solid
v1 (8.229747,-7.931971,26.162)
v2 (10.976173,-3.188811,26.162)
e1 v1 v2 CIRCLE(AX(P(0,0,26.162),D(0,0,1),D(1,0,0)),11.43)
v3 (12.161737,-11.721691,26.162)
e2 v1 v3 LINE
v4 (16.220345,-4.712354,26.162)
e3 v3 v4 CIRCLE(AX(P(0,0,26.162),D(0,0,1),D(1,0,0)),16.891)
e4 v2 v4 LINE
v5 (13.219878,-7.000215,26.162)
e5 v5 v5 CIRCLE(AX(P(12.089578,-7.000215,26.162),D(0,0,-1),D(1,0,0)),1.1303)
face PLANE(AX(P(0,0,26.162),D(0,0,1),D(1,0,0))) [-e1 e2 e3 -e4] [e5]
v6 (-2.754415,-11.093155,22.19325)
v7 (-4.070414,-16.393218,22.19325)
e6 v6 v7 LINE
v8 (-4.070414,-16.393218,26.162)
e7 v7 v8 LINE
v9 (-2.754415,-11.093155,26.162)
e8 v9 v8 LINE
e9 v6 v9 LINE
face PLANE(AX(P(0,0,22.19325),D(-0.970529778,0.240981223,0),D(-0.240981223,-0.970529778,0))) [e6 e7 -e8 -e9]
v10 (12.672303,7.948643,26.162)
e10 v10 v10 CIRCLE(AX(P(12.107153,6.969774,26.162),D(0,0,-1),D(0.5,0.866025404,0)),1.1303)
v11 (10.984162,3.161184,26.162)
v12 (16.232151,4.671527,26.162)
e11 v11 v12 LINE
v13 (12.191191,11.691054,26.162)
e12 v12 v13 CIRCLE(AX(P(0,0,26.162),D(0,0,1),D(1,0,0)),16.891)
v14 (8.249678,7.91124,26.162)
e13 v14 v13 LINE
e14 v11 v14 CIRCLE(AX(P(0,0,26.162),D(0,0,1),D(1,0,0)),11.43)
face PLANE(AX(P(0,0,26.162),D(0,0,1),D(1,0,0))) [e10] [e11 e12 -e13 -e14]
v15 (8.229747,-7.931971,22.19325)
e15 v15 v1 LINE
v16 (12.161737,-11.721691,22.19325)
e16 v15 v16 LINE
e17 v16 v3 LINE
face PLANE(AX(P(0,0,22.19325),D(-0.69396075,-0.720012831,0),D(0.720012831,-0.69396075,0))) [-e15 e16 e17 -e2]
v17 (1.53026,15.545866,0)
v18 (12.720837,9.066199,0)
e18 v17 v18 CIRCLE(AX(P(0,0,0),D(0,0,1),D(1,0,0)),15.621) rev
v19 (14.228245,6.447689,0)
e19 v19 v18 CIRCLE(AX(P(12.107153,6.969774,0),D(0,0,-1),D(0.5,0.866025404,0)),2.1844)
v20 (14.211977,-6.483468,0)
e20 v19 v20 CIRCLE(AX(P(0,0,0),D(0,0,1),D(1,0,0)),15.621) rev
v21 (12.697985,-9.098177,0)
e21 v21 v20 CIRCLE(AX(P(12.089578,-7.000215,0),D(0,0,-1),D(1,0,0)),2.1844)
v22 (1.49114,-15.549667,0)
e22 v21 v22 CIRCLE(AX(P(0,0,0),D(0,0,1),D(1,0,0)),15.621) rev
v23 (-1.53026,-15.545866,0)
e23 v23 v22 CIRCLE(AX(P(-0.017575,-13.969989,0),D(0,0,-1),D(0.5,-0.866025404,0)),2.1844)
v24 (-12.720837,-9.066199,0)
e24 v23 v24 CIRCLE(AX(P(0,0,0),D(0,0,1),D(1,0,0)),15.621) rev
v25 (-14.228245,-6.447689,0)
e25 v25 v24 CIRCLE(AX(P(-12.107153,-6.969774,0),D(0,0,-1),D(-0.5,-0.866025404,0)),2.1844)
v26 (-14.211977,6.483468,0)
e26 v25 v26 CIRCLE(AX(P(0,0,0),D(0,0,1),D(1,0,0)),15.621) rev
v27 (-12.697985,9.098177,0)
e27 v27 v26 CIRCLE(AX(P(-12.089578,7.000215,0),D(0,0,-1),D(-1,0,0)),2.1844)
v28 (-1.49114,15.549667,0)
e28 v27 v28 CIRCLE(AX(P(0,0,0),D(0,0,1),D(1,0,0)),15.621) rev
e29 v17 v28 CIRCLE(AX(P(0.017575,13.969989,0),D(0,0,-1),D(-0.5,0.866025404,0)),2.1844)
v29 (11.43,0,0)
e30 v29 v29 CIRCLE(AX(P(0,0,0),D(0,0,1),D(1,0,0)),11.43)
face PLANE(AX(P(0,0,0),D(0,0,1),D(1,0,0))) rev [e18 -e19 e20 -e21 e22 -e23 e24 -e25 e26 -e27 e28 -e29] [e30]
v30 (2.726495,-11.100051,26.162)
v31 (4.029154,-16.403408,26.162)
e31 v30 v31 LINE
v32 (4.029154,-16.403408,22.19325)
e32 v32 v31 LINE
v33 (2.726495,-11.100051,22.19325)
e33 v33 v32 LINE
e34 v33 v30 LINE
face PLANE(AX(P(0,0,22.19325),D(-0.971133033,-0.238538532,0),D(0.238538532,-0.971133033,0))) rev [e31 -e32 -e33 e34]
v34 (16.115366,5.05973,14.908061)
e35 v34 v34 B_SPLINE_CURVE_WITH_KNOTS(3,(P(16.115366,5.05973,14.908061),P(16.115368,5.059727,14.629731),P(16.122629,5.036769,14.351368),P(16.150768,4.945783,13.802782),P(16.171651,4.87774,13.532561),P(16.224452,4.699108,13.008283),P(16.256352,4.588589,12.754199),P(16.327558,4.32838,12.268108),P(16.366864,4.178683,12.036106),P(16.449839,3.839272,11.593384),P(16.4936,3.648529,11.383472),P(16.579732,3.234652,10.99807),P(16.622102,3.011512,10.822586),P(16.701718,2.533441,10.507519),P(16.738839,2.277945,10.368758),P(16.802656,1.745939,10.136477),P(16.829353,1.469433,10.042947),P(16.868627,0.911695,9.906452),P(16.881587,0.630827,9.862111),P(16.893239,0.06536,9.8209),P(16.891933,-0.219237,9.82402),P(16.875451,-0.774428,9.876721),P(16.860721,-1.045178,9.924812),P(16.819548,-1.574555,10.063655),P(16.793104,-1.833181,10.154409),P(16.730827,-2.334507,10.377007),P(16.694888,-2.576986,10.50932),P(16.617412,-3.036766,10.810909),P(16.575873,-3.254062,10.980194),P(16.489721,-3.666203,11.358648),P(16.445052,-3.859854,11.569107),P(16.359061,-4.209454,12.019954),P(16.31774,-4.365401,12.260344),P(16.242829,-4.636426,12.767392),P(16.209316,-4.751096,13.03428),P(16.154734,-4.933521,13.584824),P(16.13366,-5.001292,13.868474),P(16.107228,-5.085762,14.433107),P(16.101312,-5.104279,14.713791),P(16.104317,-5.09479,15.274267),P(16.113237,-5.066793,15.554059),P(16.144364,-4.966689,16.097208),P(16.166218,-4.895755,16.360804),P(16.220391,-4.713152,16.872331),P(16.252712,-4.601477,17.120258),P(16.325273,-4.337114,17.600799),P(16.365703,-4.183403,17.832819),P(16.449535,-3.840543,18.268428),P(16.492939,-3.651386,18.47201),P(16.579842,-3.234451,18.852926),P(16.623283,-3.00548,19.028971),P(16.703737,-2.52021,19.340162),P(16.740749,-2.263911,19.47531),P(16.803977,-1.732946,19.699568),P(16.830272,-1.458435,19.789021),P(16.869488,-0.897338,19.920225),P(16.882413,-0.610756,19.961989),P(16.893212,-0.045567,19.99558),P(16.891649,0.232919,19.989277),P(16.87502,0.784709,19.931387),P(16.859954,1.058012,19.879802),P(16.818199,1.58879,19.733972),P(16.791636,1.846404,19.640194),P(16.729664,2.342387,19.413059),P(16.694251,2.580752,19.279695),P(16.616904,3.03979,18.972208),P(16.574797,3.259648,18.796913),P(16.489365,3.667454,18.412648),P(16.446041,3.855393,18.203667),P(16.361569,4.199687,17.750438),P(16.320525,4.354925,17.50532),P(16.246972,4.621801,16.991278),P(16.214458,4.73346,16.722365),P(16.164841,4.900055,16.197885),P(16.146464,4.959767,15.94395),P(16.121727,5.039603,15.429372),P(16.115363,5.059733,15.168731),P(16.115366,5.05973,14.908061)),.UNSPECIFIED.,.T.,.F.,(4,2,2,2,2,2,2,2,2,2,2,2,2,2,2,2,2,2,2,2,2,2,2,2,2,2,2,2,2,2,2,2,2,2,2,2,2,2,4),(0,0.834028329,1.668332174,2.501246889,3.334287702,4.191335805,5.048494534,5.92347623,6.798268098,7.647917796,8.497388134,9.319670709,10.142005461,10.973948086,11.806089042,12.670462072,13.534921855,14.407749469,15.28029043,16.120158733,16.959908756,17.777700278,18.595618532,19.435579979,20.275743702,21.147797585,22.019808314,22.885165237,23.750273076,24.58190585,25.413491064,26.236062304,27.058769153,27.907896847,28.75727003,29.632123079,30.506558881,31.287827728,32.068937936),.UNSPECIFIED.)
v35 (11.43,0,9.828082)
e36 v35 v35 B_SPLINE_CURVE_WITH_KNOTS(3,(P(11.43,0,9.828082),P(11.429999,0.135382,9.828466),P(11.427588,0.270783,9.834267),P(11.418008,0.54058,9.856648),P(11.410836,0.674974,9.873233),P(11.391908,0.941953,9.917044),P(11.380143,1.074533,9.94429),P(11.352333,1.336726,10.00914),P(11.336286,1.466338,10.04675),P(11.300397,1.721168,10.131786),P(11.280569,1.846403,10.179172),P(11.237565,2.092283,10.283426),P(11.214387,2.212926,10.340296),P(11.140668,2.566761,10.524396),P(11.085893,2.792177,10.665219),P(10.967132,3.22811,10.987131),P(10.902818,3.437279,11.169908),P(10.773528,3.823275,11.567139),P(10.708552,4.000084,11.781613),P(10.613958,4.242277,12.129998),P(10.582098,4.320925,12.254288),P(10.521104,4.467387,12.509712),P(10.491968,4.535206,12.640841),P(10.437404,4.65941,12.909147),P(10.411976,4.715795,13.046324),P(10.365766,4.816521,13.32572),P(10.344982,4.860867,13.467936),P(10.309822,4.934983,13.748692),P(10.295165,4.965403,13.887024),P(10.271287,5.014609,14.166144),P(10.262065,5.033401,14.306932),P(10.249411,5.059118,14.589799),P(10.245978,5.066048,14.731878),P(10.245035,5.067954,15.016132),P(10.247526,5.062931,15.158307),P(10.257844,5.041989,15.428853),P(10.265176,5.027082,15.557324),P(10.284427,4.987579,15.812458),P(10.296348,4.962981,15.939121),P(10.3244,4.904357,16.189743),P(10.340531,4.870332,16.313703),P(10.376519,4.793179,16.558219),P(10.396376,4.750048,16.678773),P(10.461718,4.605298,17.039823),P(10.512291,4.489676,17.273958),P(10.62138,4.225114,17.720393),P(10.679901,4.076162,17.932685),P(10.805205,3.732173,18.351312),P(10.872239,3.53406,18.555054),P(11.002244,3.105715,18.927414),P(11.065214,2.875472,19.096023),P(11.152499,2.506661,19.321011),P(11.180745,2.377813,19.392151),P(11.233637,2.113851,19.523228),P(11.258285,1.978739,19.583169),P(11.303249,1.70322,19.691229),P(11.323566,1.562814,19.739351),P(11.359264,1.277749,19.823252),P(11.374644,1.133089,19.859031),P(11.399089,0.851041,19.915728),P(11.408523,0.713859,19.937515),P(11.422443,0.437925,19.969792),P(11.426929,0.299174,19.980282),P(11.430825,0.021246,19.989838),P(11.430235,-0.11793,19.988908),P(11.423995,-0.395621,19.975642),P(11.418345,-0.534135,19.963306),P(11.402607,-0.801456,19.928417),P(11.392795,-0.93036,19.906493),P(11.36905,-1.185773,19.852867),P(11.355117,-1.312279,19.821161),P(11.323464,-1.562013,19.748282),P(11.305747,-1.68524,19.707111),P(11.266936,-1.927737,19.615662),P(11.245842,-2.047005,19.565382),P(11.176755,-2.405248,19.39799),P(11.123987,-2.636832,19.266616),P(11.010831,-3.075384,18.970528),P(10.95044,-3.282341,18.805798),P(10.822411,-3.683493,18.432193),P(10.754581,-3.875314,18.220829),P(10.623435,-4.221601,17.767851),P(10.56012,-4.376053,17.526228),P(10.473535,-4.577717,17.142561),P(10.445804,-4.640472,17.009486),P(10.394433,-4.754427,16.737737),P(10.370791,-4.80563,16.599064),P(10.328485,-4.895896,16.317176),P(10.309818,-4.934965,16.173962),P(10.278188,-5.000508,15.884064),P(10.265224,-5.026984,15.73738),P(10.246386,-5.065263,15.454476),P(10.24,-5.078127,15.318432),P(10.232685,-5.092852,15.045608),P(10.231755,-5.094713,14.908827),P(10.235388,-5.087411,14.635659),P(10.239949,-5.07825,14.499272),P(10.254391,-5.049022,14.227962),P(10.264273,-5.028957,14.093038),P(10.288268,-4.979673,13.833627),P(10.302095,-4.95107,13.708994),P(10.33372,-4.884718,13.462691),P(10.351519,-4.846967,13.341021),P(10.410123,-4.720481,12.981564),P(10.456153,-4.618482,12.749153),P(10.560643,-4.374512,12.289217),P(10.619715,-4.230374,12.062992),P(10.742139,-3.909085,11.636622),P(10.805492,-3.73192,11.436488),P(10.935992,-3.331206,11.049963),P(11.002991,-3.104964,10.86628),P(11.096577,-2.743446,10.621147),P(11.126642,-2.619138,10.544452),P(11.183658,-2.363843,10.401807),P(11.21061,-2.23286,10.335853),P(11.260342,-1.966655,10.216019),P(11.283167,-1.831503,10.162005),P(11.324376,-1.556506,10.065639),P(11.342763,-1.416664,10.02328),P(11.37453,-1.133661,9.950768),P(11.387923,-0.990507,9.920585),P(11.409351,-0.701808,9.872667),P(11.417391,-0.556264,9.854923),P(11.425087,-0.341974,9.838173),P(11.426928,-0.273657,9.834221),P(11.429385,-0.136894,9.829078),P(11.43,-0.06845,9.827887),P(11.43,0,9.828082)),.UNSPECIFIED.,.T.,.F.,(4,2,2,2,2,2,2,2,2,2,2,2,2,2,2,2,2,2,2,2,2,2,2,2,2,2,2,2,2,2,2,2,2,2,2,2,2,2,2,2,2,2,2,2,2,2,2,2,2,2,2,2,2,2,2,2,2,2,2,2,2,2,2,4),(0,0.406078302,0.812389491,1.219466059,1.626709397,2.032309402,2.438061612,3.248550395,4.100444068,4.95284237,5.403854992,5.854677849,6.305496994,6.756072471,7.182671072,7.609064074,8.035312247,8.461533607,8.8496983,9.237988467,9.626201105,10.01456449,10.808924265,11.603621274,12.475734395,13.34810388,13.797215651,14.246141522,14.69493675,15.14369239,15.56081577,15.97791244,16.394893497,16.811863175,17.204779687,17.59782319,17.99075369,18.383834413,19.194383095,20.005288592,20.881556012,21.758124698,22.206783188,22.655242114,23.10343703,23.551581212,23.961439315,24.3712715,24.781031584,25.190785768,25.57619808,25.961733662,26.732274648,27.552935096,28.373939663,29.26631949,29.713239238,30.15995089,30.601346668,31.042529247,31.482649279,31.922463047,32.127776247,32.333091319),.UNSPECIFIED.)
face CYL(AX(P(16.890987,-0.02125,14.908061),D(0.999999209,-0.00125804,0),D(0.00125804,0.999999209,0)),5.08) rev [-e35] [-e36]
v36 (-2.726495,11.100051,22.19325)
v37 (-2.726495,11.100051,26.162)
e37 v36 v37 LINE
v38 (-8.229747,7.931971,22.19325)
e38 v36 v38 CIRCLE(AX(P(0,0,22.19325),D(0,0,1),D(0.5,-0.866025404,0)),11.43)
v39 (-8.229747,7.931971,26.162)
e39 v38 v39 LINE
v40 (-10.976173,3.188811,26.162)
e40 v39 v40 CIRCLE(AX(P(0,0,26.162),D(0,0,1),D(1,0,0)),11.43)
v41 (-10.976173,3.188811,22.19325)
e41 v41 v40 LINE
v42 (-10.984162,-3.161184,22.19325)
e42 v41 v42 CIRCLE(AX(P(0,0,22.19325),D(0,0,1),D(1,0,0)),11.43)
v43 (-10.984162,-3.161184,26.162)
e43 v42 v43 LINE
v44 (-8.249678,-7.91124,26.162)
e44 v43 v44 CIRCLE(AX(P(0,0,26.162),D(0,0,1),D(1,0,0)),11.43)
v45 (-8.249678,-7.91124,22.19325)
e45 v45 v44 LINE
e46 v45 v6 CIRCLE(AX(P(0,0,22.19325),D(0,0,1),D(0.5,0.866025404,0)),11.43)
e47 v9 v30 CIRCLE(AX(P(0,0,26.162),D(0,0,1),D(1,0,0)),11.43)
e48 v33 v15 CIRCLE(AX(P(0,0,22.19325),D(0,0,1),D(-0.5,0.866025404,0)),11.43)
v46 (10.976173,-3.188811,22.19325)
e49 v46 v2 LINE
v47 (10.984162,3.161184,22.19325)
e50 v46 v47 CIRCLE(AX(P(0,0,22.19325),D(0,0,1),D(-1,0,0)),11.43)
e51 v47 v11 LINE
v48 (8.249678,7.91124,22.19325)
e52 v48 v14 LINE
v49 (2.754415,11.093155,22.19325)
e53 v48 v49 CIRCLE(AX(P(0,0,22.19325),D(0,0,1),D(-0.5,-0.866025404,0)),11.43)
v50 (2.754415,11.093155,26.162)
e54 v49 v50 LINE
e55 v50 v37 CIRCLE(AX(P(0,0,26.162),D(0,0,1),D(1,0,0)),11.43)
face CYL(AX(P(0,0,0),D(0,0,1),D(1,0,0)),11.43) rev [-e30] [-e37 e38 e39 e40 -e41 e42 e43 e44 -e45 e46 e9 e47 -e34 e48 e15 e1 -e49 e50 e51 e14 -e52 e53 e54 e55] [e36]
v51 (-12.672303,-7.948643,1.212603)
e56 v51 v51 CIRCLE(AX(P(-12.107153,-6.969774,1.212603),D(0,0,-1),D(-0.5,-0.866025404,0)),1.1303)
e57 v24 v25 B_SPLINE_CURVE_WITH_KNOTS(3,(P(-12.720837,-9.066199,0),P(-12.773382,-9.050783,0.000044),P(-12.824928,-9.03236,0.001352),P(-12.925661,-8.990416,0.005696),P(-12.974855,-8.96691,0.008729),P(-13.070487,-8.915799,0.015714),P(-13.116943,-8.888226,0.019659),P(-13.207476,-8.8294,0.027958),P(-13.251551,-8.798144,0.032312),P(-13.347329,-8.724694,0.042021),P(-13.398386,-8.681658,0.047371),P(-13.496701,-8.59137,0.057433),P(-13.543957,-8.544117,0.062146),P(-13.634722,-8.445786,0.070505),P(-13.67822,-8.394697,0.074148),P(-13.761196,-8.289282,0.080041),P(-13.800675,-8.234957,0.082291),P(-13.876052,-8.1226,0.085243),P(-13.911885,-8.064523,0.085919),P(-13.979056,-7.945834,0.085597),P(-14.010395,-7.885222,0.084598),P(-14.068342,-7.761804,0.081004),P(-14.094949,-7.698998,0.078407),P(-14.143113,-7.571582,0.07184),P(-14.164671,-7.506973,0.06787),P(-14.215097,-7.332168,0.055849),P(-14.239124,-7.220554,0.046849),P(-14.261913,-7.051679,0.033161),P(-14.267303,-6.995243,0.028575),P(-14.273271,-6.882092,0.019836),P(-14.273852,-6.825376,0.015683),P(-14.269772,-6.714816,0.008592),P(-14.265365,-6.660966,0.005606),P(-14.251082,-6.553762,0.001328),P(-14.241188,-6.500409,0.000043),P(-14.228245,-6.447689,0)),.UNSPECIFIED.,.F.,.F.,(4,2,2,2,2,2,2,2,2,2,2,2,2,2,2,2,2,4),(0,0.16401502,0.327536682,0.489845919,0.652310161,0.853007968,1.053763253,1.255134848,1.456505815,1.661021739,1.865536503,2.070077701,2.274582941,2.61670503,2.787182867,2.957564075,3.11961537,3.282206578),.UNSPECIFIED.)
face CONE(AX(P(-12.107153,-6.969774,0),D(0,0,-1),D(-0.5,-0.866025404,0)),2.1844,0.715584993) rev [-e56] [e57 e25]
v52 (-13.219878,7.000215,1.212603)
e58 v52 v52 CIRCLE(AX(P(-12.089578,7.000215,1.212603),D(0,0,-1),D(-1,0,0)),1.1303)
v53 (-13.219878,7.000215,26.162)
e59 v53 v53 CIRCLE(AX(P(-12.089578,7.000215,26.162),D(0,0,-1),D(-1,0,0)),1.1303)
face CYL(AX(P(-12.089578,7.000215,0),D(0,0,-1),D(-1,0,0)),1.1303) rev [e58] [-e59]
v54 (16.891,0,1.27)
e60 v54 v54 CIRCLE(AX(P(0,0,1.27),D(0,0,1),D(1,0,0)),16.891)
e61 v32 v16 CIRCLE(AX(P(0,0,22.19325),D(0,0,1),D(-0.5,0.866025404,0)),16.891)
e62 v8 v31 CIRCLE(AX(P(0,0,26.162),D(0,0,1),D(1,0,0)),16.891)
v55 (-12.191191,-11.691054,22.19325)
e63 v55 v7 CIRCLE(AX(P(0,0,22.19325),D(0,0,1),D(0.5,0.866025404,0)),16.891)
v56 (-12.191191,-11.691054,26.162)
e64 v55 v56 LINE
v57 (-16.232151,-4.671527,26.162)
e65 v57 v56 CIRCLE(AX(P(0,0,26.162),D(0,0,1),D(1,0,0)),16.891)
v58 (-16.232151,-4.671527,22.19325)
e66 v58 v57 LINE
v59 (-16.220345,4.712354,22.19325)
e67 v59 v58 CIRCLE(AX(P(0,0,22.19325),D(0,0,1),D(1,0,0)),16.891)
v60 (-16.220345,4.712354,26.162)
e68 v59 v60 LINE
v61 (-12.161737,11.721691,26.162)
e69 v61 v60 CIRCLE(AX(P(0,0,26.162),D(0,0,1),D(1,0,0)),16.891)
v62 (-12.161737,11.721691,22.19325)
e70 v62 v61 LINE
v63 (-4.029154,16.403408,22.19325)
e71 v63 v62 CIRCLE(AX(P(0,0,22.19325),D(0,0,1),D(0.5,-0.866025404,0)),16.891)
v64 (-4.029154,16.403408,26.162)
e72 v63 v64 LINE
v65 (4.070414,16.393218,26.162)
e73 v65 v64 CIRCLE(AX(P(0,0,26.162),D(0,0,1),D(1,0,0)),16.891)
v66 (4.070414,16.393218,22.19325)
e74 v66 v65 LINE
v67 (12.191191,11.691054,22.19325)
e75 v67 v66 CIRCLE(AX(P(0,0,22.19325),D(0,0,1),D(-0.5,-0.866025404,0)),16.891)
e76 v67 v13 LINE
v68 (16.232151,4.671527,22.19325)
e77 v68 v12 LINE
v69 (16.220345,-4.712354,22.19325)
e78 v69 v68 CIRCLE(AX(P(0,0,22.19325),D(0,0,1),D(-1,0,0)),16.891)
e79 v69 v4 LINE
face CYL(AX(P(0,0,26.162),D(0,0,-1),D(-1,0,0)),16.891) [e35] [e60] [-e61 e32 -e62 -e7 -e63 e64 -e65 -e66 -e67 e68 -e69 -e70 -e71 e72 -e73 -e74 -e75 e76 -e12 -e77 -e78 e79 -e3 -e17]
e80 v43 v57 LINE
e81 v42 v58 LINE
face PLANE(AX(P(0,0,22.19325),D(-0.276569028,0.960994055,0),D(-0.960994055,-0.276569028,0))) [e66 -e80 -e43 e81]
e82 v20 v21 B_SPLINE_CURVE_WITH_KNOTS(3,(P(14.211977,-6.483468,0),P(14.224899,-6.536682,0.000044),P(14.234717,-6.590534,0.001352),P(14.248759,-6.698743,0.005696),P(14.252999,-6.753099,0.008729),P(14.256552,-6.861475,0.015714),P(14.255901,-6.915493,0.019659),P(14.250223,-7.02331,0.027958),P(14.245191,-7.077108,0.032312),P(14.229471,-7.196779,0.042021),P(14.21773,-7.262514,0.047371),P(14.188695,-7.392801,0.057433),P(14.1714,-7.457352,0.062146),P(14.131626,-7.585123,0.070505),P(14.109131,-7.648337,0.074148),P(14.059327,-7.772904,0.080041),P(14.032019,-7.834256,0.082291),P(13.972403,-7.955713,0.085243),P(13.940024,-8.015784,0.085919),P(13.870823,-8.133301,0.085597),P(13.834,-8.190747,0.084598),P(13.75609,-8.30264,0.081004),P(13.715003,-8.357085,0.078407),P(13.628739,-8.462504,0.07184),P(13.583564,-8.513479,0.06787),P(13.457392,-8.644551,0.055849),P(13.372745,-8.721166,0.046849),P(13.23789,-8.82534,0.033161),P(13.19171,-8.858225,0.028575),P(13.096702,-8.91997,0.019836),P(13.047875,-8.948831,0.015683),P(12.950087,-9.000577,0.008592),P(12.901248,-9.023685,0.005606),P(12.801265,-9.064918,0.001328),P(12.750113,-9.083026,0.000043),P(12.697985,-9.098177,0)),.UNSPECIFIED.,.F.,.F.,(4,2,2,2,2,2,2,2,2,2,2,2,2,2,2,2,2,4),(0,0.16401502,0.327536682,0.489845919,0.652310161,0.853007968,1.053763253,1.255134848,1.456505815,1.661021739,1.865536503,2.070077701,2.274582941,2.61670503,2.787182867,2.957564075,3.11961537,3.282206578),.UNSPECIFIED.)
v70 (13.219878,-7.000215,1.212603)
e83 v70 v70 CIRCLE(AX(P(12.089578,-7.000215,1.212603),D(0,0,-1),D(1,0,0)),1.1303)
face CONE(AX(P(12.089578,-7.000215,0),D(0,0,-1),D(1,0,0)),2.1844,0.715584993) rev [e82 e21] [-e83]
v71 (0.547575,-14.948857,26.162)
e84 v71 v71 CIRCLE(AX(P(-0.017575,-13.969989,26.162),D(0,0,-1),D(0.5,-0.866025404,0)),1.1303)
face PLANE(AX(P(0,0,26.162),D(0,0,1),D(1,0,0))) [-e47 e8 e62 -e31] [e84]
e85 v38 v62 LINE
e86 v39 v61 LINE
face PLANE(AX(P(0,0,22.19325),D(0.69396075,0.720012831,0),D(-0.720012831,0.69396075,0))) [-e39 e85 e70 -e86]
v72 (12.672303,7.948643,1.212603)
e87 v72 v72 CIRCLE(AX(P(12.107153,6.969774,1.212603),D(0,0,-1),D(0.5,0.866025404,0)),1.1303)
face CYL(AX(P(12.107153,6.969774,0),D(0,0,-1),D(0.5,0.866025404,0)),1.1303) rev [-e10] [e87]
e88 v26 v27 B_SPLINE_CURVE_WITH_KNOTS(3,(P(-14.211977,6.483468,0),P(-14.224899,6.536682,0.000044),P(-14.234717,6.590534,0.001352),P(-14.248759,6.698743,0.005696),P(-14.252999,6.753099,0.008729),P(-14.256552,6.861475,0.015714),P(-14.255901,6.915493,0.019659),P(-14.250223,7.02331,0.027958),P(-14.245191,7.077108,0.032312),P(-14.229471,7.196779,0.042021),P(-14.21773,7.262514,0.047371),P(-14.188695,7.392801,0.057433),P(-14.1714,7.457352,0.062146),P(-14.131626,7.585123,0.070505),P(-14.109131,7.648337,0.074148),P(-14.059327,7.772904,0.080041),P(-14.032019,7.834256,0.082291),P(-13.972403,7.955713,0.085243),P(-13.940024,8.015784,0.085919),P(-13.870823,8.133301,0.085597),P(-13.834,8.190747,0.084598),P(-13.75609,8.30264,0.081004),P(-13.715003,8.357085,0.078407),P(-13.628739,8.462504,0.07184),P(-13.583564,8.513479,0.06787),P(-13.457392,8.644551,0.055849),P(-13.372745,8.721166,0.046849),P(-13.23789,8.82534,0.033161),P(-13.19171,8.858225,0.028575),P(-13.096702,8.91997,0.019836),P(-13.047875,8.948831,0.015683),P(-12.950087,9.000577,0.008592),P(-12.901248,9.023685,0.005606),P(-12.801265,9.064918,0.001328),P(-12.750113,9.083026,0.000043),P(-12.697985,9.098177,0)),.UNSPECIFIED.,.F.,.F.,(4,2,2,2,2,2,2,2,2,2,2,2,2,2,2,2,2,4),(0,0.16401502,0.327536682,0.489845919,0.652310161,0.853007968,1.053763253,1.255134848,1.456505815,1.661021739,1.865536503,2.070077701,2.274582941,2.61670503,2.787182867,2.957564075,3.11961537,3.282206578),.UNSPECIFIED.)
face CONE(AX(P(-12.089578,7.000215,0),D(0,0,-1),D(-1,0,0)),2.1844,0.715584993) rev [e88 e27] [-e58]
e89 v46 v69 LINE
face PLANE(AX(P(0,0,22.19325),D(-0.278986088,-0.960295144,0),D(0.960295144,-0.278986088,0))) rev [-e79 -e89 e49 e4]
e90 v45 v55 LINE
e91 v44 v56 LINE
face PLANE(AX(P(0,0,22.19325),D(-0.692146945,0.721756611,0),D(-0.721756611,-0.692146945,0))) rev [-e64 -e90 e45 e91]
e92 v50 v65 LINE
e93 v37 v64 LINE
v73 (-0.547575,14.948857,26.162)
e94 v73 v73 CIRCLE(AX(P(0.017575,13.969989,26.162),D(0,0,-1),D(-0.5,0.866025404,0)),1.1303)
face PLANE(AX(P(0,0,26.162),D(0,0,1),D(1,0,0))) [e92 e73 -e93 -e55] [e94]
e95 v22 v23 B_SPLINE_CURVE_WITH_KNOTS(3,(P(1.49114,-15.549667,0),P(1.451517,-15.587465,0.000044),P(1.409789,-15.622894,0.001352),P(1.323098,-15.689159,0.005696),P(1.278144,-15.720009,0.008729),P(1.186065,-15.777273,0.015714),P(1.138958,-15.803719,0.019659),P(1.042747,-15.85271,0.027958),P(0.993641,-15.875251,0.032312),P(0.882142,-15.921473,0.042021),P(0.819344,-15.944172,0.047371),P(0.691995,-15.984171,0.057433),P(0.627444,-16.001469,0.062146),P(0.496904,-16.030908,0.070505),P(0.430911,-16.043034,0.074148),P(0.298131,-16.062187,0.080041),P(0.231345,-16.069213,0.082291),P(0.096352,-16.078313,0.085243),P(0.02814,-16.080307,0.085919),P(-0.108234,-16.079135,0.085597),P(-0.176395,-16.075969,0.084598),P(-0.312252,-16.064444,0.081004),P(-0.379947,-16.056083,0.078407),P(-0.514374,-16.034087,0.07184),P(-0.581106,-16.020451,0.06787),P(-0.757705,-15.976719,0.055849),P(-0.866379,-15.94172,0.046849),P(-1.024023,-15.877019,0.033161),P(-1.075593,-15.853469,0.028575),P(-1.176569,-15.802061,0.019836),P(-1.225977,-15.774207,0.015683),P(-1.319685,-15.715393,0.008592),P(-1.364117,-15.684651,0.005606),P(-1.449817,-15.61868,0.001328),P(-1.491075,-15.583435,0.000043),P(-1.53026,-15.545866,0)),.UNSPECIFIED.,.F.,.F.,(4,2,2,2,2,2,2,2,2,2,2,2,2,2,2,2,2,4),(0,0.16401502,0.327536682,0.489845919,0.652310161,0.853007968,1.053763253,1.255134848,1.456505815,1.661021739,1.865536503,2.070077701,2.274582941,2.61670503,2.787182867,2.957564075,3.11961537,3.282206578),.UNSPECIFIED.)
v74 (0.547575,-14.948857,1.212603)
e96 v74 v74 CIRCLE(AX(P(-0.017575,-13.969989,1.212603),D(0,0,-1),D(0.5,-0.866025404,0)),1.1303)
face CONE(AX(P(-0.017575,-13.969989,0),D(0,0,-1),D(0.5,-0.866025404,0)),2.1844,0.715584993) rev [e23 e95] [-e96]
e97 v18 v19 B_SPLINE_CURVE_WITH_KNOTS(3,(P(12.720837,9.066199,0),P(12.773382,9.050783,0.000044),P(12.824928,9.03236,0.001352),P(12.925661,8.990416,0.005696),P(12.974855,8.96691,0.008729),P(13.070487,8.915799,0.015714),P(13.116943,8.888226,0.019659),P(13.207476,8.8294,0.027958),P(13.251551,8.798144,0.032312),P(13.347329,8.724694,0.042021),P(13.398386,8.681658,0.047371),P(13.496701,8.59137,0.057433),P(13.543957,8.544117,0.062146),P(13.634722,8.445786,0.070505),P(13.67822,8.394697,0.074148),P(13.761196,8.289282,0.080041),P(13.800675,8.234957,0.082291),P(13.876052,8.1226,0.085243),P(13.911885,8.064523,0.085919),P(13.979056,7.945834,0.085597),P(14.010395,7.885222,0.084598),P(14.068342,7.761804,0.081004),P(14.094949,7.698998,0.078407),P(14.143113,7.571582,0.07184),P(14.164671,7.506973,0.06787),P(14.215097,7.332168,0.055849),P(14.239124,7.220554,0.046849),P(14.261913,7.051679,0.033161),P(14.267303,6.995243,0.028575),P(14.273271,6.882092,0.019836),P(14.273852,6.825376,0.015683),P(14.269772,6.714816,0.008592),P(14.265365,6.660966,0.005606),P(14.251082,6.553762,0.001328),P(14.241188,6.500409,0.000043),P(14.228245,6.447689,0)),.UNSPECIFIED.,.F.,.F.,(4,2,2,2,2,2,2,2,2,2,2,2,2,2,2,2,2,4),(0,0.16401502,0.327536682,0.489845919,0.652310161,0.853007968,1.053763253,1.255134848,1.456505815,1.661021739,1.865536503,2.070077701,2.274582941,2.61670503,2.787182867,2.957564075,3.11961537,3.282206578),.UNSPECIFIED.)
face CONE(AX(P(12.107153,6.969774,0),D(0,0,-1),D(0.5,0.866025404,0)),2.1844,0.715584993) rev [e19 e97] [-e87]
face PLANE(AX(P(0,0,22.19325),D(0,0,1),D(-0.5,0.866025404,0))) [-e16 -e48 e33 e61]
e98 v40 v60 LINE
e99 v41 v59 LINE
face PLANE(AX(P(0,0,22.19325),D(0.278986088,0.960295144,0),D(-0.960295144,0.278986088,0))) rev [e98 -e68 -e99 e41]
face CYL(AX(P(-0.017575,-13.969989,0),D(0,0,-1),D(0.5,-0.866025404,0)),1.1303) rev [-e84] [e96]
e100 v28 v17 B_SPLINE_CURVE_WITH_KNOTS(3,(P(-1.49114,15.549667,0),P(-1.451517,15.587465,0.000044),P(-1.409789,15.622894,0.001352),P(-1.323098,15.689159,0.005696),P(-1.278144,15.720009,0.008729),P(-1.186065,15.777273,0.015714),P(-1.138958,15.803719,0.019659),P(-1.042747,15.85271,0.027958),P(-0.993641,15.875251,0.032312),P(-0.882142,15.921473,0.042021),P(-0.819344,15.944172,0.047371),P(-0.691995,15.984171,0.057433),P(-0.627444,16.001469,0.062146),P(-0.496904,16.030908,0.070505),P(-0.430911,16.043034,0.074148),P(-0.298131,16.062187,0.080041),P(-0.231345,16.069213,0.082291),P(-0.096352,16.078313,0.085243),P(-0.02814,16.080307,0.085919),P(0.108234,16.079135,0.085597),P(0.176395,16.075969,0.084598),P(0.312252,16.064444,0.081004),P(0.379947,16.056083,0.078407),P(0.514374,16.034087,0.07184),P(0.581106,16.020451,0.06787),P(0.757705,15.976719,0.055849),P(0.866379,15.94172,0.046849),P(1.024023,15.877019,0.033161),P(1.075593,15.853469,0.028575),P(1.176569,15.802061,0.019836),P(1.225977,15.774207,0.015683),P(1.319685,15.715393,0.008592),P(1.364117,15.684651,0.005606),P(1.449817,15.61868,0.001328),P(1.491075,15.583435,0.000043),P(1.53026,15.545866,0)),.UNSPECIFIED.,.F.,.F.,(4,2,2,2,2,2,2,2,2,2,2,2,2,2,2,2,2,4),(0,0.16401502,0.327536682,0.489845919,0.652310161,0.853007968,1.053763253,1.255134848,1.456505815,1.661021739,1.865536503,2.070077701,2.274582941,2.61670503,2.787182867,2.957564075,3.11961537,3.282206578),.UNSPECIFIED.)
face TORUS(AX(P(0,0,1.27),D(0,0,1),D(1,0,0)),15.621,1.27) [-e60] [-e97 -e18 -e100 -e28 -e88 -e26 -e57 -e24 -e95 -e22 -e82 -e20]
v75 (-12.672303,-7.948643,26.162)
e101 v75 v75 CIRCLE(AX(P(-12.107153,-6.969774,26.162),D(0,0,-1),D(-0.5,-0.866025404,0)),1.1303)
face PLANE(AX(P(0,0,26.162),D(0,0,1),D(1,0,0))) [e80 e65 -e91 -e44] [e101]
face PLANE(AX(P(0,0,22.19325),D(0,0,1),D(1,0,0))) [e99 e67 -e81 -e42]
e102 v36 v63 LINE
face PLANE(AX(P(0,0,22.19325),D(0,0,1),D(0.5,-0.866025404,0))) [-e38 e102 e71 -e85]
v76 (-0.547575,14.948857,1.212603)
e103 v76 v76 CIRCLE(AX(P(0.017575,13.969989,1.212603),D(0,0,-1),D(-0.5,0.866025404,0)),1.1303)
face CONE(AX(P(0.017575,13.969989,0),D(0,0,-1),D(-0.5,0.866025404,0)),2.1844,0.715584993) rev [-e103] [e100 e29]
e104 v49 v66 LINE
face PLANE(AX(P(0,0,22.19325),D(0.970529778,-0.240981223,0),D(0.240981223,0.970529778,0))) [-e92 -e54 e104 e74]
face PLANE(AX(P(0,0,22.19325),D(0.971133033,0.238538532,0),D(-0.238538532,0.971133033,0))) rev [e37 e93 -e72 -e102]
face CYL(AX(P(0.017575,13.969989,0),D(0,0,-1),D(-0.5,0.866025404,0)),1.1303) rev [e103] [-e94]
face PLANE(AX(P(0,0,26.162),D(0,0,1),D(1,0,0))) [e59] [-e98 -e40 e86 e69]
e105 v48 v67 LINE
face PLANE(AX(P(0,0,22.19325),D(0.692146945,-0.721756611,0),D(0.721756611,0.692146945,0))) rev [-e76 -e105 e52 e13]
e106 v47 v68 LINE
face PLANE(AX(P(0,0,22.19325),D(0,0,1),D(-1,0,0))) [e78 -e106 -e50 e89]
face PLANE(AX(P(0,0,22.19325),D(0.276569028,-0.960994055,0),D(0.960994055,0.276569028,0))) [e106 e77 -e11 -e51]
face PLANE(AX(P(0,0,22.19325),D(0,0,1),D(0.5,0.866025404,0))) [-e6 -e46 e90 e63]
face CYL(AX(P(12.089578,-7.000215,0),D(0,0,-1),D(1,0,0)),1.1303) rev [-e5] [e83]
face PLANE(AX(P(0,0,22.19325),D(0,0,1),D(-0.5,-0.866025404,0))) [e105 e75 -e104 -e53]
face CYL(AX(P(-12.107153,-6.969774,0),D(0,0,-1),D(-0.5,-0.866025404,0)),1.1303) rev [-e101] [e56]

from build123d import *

# Parameters (mm, degrees)
SKETCH1_R                                      = 16.891
BOSS_EXTRUDE1_DEPTH                            = 26.162
SKETCH9_R                                      = 9.525
CUT_EXTRUDE6_DEPTH                             = 36.426854306
SKETCH10_R                                     = 11.43
BOSS_EXTRUDE2_DEPTH                            = 19.05
SKETCH11_R                                     = 9.525
CUT_EXTRUDE7_DEPTH                             = 36.426854306
CUT_EXTRUDE8_DEPTH                             = 3.96875
CSK_FOR_2_FLAT_HEAD_MACHINE_SCREW1_D           = 2.2606
CSK_FOR_2_FLAT_HEAD_MACHINE_SCREW1_CSINK_D     = 4.3688
CSK_FOR_2_FLAT_HEAD_MACHINE_SCREW1_CSINK_ANGLE = 82
CIRPATTERN1_COUNT                              = 6
F_1_2_0_4_DIAMETER_HOLE1_D                     = 10.16
F_1_2_0_4_DIAMETER_HOLE1_DEPTH                 = 12.7
F_1_2_0_4_DIAMETER_HOLE1_TIP                   = 3.052371945
FILLET1_R                                      = 1.27


with BuildPart() as part:
    # Sketch1 → Boss-Extrude1 (new body)
    with BuildSketch(Plane.XY):
        Circle(SKETCH1_R)
    extrude(amount=BOSS_EXTRUDE1_DEPTH)

    # Sketch9 → Cut-Extrude6 (cut, through all)
    with BuildSketch(Plane(origin=(0, 0, 0), x_dir=(-1, 0, 0), z_dir=(0, 0, -1))):
        Circle(SKETCH9_R)
        with BuildLine():
            ThreePointArc((-5.359640753, -7.874), (0, -9.525), (5.359640753, -7.874))
            Line((5.359640753, -7.874), (-5.359640753, -7.874))
        make_face()
        with BuildLine():
            ThreePointArc((-7.874, 5.359640753), (-9.525, 0), (-7.874, -5.359640753))
            Line((-7.874, -5.359640753), (-7.874, 5.359640753))
        make_face()
        with BuildLine():
            Line((-5.359640753, 7.874), (5.359640753, 7.874))
            ThreePointArc((5.359640753, 7.874), (0, 9.525), (-5.359640753, 7.874))
        make_face()
        with BuildLine():
            Line((7.874, 5.359640753), (7.874, -5.359640753))
            ThreePointArc((7.874, -5.359640753), (9.102897204, -2.804084075), (9.525, 0))
            ThreePointArc((9.525, 0), (9.102897204, 2.804084075), (7.874, 5.359640753))
        make_face()
    extrude(amount=-CUT_EXTRUDE6_DEPTH, mode=Mode.SUBTRACT)

    # Sketch10 → Boss-Extrude2 (add)
    # profile 1 of 2: a face of its own
    with BuildSketch(Plane(origin=(0, 0, 0), x_dir=(-1, 0, 0), z_dir=(0, 0, -1))):
        Circle(SKETCH10_R)
        with BuildLine():
            ThreePointArc((-5.359640753, -7.874), (-4.453933477, 8.419507206), (9.525, 0))
            ThreePointArc((9.525, 0), (8.419507206, -4.453933477), (5.359640753, -7.874))
            ThreePointArc((5.359640753, -7.874), (0, -9.525), (-5.359640753, -7.874))
        make_face(mode=Mode.SUBTRACT)
    # profile 2 of 2: a face of its own
    with BuildSketch(Plane(origin=(0, 0, 0), x_dir=(-1, 0, 0), z_dir=(0, 0, -1))):
        Circle(SKETCH10_R)
        with BuildLine():
            ThreePointArc((-5.359640753, -7.874), (-4.453933477, 8.419507206), (9.525, 0))
            ThreePointArc((9.525, 0), (8.419507206, -4.453933477), (5.359640753, -7.874))
            ThreePointArc((5.359640753, -7.874), (0, -9.525), (-5.359640753, -7.874))
        make_face(mode=Mode.SUBTRACT)
    extrude(amount=-BOSS_EXTRUDE2_DEPTH)

    # Sketch11 → Cut-Extrude7 (cut, through all)
    with BuildSketch(Plane.XY.offset(26.162)):
        with BuildLine():
            Line((-9.153468369, -2.634319991), (-10.984162043, -3.161183989))
            ThreePointArc((-10.984162043, -3.161183989), (1.596234295, -11.317991698), (11.43, 0))
            ThreePointArc((11.43, 0), (1.610471515, 11.315974615), (-10.976173491, 3.188810986))
            Line((-10.976173491, 3.188810986), (-9.146811242, 2.657342489))
            ThreePointArc((-9.146811242, 2.657342489), (1.342059596, 9.429978846), (9.525, 0))
            ThreePointArc((9.525, 0), (1.330195246, -9.431659748), (-9.153468369, -2.634319991))
        make_face()
        Circle(SKETCH11_R)
        with BuildLine():
            ThreePointArc((-10.984162043, -3.161183989), (-11.297244321, 0.014212394), (-10.976173491, 3.188810986))
            Line((-10.976173491, 3.188810986), (0, 0))
            Line((0, 0), (-10.984162043, -3.161183989))
        make_face()
        with BuildLine():
            ThreePointArc((-10.976173491, 3.188810986), (-11.429990955, 0.014379395), (-10.984162043, -3.161183989))
            ThreePointArc((-10.984162043, -3.161183989), (-11.297244321, 0.014212394), (-10.976173491, 3.188810986))
        make_face()
    extrude(amount=-CUT_EXTRUDE7_DEPTH, mode=Mode.SUBTRACT)

    # Sketch11<4> → Cut-Extrude8 (cut)
    with BuildSketch(Plane.XY.offset(26.162)):
        with BuildLine():
            ThreePointArc((-10.976173491, 3.188810986), (-11.297244321, 0.014212394), (-10.984162043, -3.161183989))
            Line((-10.984162043, -3.161183989), (0, 0))
            Line((0, 0), (-10.976173491, 3.188810986))
        make_face()
        with BuildLine():
            ThreePointArc((-10.976173491, 3.188810986), (-11.429990955, 0.014379395), (-10.984162043, -3.161183989))
            ThreePointArc((-10.984162043, -3.161183989), (-11.297244321, 0.014212394), (-10.976173491, 3.188810986))
        make_face()
        with BuildLine():
            Line((-16.232150575, -4.67152745), (-10.984162043, -3.161183989))
            ThreePointArc((-10.984162043, -3.161183989), (-11.429990955, 0.014379395), (-10.976173491, 3.188810986))
            Line((-10.976173491, 3.188810986), (-16.220345269, 4.712354013))
            ThreePointArc((-16.220345269, 4.712354013), (-16.925737574, 0.021293268), (-16.232150575, -4.67152745))
        make_face()
        with BuildLine():
            Line((0, 0), (-10.984162043, -3.161183989))
            ThreePointArc((-10.984162043, -3.161183989), (1.596234295, -11.317991698), (11.43, 0))
            ThreePointArc((11.43, 0), (1.610471515, 11.315974615), (-10.976173491, 3.188810986))
            Line((-10.976173491, 3.188810986), (0, 0))
        make_face()
    cut_extrude8 = extrude(amount=-CUT_EXTRUDE8_DEPTH, mode=Mode.SUBTRACT)

    # CSK for #2 Flat Head Machine Screw1 (through all)
    with Locations(Plane(origin=(0, 0, 0), x_dir=(-1, 0, 0), z_dir=(0, 0, -1))):
        with Locations((12.089577909, 7.000214709)):
            csk_for_2_flat_head_machine_screw1 = CounterSinkHole(CSK_FOR_2_FLAT_HEAD_MACHINE_SCREW1_D / 2, CSK_FOR_2_FLAT_HEAD_MACHINE_SCREW1_CSINK_D / 2, counter_sink_angle=CSK_FOR_2_FLAT_HEAD_MACHINE_SCREW1_CSINK_ANGLE)

    # CirPattern1: Cut-Extrude8, CSK for #2 Flat Head Machine Screw1 ×6 about axis
    cirpattern1_axis = Axis((0, 0, 0), (0, 0, 1))
    add([cut_extrude8.rotate(cirpattern1_axis, i * 360 / CIRPATTERN1_COUNT) for i in range(1, CIRPATTERN1_COUNT)], mode=Mode.SUBTRACT)
    add([csk_for_2_flat_head_machine_screw1.rotate(cirpattern1_axis, i * 360 / CIRPATTERN1_COUNT) for i in range(1, CIRPATTERN1_COUNT)], mode=Mode.SUBTRACT)

    # 1/2 (0.4) Diameter Hole1
    with Locations(Plane(origin=(16.890986634, -0.02124955, 14.908061188), x_dir=(0.001258039772, 0.999999208668, 0), z_dir=(0.999999208668, -0.001258039772, 0))):
        with Locations((0, 0)):
            Hole(F_1_2_0_4_DIAMETER_HOLE1_D / 2, depth=F_1_2_0_4_DIAMETER_HOLE1_DEPTH)
            with Locations((0, 0, -(F_1_2_0_4_DIAMETER_HOLE1_DEPTH + F_1_2_0_4_DIAMETER_HOLE1_TIP / 2))):  # 118° drill point
                Cone(0, F_1_2_0_4_DIAMETER_HOLE1_D / 2, F_1_2_0_4_DIAMETER_HOLE1_TIP, mode=Mode.SUBTRACT)

    # Fillet1
    # the kernel refuses this fillet: 1.27 mm, written as the material it takes off along each edge
    with BuildSketch(Plane(origin=(0, 0, 0), x_dir=(1, 0, 0), z_dir=(0, -1, 0))) as fillet1_piece_1:
        with BuildLine():
            CenterArc((16.891 - FILLET1_R, FILLET1_R), FILLET1_R, 270, 90)
            Line((16.891 - FILLET1_R, 0), (16.891, 0))
            Line((16.891, 0), (16.891, FILLET1_R))
        make_face()
    revolve(axis=Axis((0, 0, 0), (0, 0, 1)), mode=Mode.SUBTRACT)


solid = part.part
